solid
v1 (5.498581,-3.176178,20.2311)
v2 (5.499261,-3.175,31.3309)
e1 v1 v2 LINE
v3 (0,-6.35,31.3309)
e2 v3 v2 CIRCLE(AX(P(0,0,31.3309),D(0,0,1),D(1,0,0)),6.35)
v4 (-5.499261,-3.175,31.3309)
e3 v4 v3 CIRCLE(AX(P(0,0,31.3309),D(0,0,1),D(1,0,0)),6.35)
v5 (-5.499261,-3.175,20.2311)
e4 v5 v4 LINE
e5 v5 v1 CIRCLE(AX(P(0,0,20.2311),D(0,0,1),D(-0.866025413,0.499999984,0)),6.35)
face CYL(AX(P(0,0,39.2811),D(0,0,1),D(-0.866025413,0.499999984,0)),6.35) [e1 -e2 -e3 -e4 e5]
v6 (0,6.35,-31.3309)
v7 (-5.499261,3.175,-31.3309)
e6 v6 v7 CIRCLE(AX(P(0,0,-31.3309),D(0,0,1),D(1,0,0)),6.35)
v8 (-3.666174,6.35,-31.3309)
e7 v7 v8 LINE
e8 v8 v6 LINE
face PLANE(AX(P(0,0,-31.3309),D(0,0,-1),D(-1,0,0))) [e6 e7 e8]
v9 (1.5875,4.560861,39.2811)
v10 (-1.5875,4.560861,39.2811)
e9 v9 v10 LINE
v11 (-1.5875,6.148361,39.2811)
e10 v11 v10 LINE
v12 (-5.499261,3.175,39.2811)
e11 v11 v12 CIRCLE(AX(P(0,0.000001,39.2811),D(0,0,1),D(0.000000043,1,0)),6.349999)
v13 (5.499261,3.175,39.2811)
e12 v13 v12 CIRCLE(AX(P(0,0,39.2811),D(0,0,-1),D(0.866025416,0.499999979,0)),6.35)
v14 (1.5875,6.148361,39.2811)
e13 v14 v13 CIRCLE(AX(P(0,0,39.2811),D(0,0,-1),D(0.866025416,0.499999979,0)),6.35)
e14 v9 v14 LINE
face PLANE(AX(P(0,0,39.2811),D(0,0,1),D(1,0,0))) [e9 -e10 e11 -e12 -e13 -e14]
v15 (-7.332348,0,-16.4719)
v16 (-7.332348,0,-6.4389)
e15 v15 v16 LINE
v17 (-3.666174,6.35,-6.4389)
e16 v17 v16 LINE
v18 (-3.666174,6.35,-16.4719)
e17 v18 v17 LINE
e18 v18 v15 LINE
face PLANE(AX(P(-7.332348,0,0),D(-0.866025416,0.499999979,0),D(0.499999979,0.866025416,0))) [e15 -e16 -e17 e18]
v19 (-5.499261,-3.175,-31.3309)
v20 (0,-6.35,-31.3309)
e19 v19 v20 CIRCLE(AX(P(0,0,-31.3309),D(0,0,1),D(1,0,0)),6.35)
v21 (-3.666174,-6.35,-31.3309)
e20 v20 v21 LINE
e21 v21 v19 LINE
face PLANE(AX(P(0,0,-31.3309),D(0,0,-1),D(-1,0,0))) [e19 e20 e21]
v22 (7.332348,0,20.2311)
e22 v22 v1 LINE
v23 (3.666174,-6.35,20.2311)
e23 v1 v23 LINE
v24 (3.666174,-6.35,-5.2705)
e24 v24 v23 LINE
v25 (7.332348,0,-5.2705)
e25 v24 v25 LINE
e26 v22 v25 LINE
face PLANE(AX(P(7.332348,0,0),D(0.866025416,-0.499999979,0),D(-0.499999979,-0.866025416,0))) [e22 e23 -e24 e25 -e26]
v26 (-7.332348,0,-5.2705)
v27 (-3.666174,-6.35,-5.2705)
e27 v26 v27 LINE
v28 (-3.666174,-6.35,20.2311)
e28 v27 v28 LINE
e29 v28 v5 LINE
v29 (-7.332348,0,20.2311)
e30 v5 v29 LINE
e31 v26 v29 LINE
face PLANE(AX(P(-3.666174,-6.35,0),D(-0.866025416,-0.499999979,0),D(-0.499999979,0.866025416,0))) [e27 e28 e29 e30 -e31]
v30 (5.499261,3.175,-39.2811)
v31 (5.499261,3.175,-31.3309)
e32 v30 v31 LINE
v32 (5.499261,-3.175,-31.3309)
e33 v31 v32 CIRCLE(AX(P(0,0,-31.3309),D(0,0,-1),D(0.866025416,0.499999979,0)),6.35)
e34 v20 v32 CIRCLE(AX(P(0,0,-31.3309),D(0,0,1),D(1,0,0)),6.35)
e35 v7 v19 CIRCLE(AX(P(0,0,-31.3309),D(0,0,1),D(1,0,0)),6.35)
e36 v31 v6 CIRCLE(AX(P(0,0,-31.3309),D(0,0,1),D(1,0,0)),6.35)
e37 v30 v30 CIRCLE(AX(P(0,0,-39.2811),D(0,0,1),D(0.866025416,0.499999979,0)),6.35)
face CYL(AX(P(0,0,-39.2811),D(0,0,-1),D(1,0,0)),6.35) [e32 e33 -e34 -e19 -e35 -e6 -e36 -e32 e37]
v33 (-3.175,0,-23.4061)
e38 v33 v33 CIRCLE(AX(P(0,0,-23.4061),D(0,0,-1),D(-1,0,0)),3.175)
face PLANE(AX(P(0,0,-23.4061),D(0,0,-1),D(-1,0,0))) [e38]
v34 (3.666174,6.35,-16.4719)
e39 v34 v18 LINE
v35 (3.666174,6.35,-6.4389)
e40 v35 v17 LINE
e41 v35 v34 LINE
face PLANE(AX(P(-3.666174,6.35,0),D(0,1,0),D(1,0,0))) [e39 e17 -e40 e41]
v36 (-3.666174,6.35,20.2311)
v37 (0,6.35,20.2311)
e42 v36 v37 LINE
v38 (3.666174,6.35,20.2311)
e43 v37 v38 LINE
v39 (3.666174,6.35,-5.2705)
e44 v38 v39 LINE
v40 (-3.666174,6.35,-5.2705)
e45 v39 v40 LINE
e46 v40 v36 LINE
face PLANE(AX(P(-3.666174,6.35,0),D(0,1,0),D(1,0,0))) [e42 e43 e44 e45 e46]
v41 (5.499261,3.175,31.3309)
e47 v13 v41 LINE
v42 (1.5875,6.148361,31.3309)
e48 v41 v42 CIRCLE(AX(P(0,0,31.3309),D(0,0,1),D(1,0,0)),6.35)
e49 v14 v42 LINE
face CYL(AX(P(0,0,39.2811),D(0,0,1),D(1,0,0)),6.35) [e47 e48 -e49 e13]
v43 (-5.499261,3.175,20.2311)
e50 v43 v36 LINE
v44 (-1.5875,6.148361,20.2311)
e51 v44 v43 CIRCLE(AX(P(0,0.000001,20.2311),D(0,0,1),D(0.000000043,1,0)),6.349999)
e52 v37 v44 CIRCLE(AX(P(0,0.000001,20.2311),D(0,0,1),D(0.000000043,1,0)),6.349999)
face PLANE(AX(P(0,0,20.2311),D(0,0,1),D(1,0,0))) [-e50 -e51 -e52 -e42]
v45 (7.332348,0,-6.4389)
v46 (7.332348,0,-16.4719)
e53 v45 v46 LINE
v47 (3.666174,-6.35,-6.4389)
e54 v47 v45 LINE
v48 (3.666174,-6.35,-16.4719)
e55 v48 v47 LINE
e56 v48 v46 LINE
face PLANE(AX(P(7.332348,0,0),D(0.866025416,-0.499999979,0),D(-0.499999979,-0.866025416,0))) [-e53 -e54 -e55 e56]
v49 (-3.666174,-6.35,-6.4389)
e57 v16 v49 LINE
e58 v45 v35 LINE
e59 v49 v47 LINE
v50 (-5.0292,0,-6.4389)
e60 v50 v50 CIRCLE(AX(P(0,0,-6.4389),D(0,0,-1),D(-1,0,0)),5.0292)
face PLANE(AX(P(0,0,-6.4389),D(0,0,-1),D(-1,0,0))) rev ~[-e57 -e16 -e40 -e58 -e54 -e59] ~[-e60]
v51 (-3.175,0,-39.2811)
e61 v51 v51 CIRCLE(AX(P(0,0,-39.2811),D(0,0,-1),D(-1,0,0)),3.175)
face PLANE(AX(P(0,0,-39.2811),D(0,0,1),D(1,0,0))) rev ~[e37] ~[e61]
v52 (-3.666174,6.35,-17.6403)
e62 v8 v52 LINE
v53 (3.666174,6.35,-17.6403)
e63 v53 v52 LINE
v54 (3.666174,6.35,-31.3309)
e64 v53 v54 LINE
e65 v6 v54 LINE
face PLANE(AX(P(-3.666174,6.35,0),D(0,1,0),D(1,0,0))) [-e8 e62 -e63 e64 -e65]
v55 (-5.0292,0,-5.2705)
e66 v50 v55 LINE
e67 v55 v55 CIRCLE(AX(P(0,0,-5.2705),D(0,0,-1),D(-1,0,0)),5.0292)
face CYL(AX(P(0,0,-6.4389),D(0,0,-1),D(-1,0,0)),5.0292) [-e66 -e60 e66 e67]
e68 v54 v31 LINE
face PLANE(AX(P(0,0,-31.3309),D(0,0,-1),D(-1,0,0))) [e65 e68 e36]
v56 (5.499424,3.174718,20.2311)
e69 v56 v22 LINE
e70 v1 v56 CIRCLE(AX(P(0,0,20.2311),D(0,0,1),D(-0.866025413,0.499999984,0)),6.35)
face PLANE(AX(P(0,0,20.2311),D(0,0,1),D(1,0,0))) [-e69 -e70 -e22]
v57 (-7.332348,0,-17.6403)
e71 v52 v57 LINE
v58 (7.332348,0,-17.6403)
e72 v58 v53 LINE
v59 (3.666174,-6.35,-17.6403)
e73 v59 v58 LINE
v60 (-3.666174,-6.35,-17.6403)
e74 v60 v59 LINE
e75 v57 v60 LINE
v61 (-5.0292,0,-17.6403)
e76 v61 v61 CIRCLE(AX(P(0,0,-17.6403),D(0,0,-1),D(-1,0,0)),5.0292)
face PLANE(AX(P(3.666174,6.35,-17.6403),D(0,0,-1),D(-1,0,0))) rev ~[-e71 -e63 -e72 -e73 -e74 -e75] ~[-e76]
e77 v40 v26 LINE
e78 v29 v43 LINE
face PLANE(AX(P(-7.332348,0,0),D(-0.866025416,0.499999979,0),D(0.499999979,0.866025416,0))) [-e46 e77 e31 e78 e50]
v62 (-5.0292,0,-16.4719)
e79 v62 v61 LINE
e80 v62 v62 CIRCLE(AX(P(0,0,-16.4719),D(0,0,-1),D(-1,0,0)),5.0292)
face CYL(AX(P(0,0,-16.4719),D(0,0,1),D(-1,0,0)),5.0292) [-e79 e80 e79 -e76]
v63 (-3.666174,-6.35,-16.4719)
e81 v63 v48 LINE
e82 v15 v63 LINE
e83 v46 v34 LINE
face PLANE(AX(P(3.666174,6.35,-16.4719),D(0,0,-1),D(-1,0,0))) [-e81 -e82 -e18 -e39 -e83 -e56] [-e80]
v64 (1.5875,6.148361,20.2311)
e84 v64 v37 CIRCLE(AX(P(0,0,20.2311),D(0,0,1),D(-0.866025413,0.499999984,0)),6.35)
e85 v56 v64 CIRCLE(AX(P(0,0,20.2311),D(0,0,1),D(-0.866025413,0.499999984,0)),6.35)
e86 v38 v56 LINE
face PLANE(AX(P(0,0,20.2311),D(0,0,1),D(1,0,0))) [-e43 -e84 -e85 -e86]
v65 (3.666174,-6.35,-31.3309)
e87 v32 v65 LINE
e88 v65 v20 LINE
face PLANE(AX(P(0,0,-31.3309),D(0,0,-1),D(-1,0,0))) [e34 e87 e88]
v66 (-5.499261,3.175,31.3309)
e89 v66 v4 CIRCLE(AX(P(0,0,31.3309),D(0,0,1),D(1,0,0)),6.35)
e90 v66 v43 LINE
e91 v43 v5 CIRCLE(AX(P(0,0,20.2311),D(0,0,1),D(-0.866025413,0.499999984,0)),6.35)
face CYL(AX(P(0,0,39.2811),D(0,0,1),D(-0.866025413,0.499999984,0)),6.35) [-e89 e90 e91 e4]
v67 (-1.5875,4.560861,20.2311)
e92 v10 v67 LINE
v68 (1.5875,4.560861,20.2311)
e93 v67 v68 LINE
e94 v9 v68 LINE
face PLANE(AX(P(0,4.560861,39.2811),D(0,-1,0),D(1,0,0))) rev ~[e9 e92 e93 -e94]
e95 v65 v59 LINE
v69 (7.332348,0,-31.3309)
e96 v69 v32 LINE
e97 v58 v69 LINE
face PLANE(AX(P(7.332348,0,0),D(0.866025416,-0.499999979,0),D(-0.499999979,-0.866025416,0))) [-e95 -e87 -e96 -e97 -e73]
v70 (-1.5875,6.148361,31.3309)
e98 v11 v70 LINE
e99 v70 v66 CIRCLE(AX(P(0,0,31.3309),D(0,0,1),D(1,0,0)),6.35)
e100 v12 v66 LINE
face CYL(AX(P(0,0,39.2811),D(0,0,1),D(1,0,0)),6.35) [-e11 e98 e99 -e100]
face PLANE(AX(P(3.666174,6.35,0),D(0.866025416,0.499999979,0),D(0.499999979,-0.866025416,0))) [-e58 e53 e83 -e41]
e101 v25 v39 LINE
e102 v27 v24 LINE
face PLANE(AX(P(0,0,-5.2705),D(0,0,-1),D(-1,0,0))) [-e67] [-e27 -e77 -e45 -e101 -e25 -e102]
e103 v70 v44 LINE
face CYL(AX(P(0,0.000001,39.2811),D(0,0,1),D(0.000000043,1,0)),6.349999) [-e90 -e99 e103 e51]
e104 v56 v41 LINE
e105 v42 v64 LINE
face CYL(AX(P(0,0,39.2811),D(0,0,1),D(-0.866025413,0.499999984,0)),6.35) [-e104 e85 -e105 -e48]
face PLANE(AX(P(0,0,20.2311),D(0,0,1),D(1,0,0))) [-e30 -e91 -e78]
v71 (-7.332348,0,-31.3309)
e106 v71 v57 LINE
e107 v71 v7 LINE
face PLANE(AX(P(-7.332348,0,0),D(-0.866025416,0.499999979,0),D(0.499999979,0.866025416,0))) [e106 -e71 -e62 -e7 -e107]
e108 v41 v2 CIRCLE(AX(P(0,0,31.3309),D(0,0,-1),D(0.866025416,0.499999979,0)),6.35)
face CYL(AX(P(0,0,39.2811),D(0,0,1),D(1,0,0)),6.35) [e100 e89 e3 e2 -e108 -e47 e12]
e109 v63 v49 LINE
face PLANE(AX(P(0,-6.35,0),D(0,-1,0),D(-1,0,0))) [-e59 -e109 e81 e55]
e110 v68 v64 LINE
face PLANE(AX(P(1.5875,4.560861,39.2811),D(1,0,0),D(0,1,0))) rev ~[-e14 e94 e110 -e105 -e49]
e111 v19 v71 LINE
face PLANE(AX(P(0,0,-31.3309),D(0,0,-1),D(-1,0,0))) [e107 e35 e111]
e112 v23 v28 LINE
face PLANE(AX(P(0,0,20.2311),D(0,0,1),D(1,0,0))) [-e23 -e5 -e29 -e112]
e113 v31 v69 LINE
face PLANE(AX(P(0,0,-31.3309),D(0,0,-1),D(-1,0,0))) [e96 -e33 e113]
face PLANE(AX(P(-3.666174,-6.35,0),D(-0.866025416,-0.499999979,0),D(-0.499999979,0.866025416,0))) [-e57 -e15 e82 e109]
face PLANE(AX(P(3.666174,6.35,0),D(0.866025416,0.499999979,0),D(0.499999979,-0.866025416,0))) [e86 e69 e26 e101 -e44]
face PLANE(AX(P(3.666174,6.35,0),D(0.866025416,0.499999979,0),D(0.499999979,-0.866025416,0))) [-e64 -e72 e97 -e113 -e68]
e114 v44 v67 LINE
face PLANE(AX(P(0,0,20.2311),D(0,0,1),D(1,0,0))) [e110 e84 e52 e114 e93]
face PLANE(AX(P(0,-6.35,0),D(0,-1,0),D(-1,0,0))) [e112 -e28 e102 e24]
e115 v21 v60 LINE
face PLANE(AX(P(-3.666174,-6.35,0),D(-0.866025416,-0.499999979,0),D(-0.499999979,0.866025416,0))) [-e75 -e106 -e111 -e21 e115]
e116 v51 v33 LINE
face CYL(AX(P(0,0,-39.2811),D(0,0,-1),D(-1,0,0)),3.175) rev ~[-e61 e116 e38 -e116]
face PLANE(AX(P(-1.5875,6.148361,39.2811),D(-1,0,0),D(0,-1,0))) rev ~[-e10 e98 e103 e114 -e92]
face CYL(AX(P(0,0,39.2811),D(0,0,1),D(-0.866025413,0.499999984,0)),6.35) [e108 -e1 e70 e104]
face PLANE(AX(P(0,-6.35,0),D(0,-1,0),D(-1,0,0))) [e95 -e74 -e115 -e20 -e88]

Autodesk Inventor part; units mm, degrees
ref_plane "YZ Plane" through (0, 0, 0) normal (1, 0, 0) x (0, 1, 0)
sketch "Sketch1" plane through (0, 0, 0) normal (0, 0, 1) x (1, 0, 0)
  line L0 (-3.666174, 6.35) -> (3.666174, 6.35)
  line L1 (3.666174, 6.35) -> (7.332348, 0)
  line L2 (7.332348, 0) -> (3.666174, -6.35)
  line L3 (3.666174, -6.35) -> (-3.666174, -6.35)
  line L4 (-3.666174, -6.35) -> (-7.332348, 0)
  line L5 (-7.332348, 0) -> (-3.666174, 6.35)
  line L6 (-10.265288, 0) -> (10.265288, 0)
  line L7 (0, -8.89) -> (0, 8.89)
  point P0 (0, 0)
  point P1 (0, 0)
  dimension "d0" = 12.7
extrude "Extrusion1" add sketch "Sketch1" along normal mid plane 78.5622
sketch "Sketch5" plane through (0, 0, 39.2811) normal (0, 0, 1) x (1, 0, 0)
  line L0 (3.666174, 6.35) -> (7.332348, 0)
  line L1 (-3.666174, 6.35) -> (3.666174, 6.35)
  line L2 (-7.332348, 0) -> (-3.666174, 6.35)
  line L3 (-3.666174, -6.35) -> (-7.332348, 0)
  line L4 (3.666174, -6.35) -> (-3.666174, -6.35)
  line L5 (7.332348, 0) -> (3.666174, -6.35)
  circle A0 centre (0, 0) radius 6.35
extrude "Bearing Insert" cut sketch "Sketch5" against normal blind 7.9502 contours L0 A0 L1 | L0 L5 A0 | A0 L2 L1 | A0 L3 L2 | L5 L4 A0 | A0 L4 L3
mirror "Bearing Insert Mirror" about plane through (0, 0, 0) normal (0, 0, 1) of "Bearing Insert"
sketch "Sketch6" plane through (0, 0, -39.2811) normal (0, 0, -1) x (-1, 0, 0)
  circle A0 centre (0, 0) radius 6.35 projected
  circle A1 centre (0, 0) radius 3.175
  dimension "d11" = 6.35
extrude "Extrusion5" cut sketch "Sketch6" against normal blind 15.875 contours A1
ref_plane "Work Plane2" through (3.666174, 6.35, -16.4719) normal (0, 0, -1) x (-1, 0, 0)
sketch "Sketch7" plane through (3.666174, 6.35, -16.4719) normal (0, 0, -1) x (-1, 0, 0)
  line L0 (0, 0) -> (3.666174, 0)
  line L1 (-1.833087, -3.175) -> (0, 0)
  circle A0 centre (3.666174, -6.35) radius 5.0292
  circle A1 centre (3.666174, -6.35) radius 7.332348
  dimension "d16" = 10.0584
extrude "Extrusion6" cut sketch "Sketch7" along normal blind 1.1684
ref_plane "Work Plane3" through (0, 0, -6.4389) normal (0, 0, -1) x (-1, 0, 0)
sketch "Sketch8" plane through (0, 0, -6.4389) normal (0, 0, -1) x (-1, 0, 0)
  line L0 (5.499261, 3.175) -> (7.332348, 0)
  line L1 (7.332348, 0) -> (5.499261, -3.175)
  circle A0 centre (0, 0) radius 5.0292
  circle A1 centre (0, 0) radius 7.332348
  point P0 (0, 0)
  dimension "d20" = 10.0584
extrude "Extrusion7" cut sketch "Sketch8" against normal blind 1.1684
sketch "Sketch9" plane through (0, 0, 39.2811) normal (0, 0, 1) x (1, 0, 0)
  circle A0 centre (0, 0) radius 6.35
  line L0 (-3.666174, 6.35) -> (0, 6.35)
  line L1 (-5.499261, 3.175) -> (-3.666174, 6.35)
  circle A1 centre (0, 0) radius 7.332348
sketch "Sketch9 outline for Extrusion8" plane through (0, 0, 39.2811) normal (0, 0, 1) x (1, 0, 0)
  circle A0 centre (0, 0) radius 7.332348
  arc A1 (-5.499261, 3.175) -> (0, 6.35) centre (0, 0) ccw
  arc A2 (0, 6.35) -> (-5.499261, 3.175) centre (0, 0) ccw
extrude "Extrusion8" cut sketch "Sketch9 outline for Extrusion8" against normal blind 19.05
sketch "Sketch10" plane through (0, 0, 39.2811) normal (0, 0, 1) x (1, 0, 0)
  circle A0 centre (0, 0) radius 6.35
  line L0 (-1.5875, 6.148361) -> (-1.5875, 4.560861)
  line L1 (-1.5875, 4.560861) -> (1.5875, 4.560861)
  line L2 (1.5875, 4.560861) -> (1.5875, 6.148361)
  line L3 (-10.265288, 0) -> (10.265288, 0)
  line L4 (0, -8.89) -> (0, 8.89)
  point P0 (0, 4.560861)
  dimension "d25" = 3.175
  dimension "d26" = 1.5875
extrude "Extrusion9" cut sketch "Sketch10" against normal up to surface (19.05 mm away) contours L2 L1 L4 A0 | L4 L1 L0 A0
equation "\"d26\" = 0.5 * d25"
properties part number "output_shaft" material "Steel"
